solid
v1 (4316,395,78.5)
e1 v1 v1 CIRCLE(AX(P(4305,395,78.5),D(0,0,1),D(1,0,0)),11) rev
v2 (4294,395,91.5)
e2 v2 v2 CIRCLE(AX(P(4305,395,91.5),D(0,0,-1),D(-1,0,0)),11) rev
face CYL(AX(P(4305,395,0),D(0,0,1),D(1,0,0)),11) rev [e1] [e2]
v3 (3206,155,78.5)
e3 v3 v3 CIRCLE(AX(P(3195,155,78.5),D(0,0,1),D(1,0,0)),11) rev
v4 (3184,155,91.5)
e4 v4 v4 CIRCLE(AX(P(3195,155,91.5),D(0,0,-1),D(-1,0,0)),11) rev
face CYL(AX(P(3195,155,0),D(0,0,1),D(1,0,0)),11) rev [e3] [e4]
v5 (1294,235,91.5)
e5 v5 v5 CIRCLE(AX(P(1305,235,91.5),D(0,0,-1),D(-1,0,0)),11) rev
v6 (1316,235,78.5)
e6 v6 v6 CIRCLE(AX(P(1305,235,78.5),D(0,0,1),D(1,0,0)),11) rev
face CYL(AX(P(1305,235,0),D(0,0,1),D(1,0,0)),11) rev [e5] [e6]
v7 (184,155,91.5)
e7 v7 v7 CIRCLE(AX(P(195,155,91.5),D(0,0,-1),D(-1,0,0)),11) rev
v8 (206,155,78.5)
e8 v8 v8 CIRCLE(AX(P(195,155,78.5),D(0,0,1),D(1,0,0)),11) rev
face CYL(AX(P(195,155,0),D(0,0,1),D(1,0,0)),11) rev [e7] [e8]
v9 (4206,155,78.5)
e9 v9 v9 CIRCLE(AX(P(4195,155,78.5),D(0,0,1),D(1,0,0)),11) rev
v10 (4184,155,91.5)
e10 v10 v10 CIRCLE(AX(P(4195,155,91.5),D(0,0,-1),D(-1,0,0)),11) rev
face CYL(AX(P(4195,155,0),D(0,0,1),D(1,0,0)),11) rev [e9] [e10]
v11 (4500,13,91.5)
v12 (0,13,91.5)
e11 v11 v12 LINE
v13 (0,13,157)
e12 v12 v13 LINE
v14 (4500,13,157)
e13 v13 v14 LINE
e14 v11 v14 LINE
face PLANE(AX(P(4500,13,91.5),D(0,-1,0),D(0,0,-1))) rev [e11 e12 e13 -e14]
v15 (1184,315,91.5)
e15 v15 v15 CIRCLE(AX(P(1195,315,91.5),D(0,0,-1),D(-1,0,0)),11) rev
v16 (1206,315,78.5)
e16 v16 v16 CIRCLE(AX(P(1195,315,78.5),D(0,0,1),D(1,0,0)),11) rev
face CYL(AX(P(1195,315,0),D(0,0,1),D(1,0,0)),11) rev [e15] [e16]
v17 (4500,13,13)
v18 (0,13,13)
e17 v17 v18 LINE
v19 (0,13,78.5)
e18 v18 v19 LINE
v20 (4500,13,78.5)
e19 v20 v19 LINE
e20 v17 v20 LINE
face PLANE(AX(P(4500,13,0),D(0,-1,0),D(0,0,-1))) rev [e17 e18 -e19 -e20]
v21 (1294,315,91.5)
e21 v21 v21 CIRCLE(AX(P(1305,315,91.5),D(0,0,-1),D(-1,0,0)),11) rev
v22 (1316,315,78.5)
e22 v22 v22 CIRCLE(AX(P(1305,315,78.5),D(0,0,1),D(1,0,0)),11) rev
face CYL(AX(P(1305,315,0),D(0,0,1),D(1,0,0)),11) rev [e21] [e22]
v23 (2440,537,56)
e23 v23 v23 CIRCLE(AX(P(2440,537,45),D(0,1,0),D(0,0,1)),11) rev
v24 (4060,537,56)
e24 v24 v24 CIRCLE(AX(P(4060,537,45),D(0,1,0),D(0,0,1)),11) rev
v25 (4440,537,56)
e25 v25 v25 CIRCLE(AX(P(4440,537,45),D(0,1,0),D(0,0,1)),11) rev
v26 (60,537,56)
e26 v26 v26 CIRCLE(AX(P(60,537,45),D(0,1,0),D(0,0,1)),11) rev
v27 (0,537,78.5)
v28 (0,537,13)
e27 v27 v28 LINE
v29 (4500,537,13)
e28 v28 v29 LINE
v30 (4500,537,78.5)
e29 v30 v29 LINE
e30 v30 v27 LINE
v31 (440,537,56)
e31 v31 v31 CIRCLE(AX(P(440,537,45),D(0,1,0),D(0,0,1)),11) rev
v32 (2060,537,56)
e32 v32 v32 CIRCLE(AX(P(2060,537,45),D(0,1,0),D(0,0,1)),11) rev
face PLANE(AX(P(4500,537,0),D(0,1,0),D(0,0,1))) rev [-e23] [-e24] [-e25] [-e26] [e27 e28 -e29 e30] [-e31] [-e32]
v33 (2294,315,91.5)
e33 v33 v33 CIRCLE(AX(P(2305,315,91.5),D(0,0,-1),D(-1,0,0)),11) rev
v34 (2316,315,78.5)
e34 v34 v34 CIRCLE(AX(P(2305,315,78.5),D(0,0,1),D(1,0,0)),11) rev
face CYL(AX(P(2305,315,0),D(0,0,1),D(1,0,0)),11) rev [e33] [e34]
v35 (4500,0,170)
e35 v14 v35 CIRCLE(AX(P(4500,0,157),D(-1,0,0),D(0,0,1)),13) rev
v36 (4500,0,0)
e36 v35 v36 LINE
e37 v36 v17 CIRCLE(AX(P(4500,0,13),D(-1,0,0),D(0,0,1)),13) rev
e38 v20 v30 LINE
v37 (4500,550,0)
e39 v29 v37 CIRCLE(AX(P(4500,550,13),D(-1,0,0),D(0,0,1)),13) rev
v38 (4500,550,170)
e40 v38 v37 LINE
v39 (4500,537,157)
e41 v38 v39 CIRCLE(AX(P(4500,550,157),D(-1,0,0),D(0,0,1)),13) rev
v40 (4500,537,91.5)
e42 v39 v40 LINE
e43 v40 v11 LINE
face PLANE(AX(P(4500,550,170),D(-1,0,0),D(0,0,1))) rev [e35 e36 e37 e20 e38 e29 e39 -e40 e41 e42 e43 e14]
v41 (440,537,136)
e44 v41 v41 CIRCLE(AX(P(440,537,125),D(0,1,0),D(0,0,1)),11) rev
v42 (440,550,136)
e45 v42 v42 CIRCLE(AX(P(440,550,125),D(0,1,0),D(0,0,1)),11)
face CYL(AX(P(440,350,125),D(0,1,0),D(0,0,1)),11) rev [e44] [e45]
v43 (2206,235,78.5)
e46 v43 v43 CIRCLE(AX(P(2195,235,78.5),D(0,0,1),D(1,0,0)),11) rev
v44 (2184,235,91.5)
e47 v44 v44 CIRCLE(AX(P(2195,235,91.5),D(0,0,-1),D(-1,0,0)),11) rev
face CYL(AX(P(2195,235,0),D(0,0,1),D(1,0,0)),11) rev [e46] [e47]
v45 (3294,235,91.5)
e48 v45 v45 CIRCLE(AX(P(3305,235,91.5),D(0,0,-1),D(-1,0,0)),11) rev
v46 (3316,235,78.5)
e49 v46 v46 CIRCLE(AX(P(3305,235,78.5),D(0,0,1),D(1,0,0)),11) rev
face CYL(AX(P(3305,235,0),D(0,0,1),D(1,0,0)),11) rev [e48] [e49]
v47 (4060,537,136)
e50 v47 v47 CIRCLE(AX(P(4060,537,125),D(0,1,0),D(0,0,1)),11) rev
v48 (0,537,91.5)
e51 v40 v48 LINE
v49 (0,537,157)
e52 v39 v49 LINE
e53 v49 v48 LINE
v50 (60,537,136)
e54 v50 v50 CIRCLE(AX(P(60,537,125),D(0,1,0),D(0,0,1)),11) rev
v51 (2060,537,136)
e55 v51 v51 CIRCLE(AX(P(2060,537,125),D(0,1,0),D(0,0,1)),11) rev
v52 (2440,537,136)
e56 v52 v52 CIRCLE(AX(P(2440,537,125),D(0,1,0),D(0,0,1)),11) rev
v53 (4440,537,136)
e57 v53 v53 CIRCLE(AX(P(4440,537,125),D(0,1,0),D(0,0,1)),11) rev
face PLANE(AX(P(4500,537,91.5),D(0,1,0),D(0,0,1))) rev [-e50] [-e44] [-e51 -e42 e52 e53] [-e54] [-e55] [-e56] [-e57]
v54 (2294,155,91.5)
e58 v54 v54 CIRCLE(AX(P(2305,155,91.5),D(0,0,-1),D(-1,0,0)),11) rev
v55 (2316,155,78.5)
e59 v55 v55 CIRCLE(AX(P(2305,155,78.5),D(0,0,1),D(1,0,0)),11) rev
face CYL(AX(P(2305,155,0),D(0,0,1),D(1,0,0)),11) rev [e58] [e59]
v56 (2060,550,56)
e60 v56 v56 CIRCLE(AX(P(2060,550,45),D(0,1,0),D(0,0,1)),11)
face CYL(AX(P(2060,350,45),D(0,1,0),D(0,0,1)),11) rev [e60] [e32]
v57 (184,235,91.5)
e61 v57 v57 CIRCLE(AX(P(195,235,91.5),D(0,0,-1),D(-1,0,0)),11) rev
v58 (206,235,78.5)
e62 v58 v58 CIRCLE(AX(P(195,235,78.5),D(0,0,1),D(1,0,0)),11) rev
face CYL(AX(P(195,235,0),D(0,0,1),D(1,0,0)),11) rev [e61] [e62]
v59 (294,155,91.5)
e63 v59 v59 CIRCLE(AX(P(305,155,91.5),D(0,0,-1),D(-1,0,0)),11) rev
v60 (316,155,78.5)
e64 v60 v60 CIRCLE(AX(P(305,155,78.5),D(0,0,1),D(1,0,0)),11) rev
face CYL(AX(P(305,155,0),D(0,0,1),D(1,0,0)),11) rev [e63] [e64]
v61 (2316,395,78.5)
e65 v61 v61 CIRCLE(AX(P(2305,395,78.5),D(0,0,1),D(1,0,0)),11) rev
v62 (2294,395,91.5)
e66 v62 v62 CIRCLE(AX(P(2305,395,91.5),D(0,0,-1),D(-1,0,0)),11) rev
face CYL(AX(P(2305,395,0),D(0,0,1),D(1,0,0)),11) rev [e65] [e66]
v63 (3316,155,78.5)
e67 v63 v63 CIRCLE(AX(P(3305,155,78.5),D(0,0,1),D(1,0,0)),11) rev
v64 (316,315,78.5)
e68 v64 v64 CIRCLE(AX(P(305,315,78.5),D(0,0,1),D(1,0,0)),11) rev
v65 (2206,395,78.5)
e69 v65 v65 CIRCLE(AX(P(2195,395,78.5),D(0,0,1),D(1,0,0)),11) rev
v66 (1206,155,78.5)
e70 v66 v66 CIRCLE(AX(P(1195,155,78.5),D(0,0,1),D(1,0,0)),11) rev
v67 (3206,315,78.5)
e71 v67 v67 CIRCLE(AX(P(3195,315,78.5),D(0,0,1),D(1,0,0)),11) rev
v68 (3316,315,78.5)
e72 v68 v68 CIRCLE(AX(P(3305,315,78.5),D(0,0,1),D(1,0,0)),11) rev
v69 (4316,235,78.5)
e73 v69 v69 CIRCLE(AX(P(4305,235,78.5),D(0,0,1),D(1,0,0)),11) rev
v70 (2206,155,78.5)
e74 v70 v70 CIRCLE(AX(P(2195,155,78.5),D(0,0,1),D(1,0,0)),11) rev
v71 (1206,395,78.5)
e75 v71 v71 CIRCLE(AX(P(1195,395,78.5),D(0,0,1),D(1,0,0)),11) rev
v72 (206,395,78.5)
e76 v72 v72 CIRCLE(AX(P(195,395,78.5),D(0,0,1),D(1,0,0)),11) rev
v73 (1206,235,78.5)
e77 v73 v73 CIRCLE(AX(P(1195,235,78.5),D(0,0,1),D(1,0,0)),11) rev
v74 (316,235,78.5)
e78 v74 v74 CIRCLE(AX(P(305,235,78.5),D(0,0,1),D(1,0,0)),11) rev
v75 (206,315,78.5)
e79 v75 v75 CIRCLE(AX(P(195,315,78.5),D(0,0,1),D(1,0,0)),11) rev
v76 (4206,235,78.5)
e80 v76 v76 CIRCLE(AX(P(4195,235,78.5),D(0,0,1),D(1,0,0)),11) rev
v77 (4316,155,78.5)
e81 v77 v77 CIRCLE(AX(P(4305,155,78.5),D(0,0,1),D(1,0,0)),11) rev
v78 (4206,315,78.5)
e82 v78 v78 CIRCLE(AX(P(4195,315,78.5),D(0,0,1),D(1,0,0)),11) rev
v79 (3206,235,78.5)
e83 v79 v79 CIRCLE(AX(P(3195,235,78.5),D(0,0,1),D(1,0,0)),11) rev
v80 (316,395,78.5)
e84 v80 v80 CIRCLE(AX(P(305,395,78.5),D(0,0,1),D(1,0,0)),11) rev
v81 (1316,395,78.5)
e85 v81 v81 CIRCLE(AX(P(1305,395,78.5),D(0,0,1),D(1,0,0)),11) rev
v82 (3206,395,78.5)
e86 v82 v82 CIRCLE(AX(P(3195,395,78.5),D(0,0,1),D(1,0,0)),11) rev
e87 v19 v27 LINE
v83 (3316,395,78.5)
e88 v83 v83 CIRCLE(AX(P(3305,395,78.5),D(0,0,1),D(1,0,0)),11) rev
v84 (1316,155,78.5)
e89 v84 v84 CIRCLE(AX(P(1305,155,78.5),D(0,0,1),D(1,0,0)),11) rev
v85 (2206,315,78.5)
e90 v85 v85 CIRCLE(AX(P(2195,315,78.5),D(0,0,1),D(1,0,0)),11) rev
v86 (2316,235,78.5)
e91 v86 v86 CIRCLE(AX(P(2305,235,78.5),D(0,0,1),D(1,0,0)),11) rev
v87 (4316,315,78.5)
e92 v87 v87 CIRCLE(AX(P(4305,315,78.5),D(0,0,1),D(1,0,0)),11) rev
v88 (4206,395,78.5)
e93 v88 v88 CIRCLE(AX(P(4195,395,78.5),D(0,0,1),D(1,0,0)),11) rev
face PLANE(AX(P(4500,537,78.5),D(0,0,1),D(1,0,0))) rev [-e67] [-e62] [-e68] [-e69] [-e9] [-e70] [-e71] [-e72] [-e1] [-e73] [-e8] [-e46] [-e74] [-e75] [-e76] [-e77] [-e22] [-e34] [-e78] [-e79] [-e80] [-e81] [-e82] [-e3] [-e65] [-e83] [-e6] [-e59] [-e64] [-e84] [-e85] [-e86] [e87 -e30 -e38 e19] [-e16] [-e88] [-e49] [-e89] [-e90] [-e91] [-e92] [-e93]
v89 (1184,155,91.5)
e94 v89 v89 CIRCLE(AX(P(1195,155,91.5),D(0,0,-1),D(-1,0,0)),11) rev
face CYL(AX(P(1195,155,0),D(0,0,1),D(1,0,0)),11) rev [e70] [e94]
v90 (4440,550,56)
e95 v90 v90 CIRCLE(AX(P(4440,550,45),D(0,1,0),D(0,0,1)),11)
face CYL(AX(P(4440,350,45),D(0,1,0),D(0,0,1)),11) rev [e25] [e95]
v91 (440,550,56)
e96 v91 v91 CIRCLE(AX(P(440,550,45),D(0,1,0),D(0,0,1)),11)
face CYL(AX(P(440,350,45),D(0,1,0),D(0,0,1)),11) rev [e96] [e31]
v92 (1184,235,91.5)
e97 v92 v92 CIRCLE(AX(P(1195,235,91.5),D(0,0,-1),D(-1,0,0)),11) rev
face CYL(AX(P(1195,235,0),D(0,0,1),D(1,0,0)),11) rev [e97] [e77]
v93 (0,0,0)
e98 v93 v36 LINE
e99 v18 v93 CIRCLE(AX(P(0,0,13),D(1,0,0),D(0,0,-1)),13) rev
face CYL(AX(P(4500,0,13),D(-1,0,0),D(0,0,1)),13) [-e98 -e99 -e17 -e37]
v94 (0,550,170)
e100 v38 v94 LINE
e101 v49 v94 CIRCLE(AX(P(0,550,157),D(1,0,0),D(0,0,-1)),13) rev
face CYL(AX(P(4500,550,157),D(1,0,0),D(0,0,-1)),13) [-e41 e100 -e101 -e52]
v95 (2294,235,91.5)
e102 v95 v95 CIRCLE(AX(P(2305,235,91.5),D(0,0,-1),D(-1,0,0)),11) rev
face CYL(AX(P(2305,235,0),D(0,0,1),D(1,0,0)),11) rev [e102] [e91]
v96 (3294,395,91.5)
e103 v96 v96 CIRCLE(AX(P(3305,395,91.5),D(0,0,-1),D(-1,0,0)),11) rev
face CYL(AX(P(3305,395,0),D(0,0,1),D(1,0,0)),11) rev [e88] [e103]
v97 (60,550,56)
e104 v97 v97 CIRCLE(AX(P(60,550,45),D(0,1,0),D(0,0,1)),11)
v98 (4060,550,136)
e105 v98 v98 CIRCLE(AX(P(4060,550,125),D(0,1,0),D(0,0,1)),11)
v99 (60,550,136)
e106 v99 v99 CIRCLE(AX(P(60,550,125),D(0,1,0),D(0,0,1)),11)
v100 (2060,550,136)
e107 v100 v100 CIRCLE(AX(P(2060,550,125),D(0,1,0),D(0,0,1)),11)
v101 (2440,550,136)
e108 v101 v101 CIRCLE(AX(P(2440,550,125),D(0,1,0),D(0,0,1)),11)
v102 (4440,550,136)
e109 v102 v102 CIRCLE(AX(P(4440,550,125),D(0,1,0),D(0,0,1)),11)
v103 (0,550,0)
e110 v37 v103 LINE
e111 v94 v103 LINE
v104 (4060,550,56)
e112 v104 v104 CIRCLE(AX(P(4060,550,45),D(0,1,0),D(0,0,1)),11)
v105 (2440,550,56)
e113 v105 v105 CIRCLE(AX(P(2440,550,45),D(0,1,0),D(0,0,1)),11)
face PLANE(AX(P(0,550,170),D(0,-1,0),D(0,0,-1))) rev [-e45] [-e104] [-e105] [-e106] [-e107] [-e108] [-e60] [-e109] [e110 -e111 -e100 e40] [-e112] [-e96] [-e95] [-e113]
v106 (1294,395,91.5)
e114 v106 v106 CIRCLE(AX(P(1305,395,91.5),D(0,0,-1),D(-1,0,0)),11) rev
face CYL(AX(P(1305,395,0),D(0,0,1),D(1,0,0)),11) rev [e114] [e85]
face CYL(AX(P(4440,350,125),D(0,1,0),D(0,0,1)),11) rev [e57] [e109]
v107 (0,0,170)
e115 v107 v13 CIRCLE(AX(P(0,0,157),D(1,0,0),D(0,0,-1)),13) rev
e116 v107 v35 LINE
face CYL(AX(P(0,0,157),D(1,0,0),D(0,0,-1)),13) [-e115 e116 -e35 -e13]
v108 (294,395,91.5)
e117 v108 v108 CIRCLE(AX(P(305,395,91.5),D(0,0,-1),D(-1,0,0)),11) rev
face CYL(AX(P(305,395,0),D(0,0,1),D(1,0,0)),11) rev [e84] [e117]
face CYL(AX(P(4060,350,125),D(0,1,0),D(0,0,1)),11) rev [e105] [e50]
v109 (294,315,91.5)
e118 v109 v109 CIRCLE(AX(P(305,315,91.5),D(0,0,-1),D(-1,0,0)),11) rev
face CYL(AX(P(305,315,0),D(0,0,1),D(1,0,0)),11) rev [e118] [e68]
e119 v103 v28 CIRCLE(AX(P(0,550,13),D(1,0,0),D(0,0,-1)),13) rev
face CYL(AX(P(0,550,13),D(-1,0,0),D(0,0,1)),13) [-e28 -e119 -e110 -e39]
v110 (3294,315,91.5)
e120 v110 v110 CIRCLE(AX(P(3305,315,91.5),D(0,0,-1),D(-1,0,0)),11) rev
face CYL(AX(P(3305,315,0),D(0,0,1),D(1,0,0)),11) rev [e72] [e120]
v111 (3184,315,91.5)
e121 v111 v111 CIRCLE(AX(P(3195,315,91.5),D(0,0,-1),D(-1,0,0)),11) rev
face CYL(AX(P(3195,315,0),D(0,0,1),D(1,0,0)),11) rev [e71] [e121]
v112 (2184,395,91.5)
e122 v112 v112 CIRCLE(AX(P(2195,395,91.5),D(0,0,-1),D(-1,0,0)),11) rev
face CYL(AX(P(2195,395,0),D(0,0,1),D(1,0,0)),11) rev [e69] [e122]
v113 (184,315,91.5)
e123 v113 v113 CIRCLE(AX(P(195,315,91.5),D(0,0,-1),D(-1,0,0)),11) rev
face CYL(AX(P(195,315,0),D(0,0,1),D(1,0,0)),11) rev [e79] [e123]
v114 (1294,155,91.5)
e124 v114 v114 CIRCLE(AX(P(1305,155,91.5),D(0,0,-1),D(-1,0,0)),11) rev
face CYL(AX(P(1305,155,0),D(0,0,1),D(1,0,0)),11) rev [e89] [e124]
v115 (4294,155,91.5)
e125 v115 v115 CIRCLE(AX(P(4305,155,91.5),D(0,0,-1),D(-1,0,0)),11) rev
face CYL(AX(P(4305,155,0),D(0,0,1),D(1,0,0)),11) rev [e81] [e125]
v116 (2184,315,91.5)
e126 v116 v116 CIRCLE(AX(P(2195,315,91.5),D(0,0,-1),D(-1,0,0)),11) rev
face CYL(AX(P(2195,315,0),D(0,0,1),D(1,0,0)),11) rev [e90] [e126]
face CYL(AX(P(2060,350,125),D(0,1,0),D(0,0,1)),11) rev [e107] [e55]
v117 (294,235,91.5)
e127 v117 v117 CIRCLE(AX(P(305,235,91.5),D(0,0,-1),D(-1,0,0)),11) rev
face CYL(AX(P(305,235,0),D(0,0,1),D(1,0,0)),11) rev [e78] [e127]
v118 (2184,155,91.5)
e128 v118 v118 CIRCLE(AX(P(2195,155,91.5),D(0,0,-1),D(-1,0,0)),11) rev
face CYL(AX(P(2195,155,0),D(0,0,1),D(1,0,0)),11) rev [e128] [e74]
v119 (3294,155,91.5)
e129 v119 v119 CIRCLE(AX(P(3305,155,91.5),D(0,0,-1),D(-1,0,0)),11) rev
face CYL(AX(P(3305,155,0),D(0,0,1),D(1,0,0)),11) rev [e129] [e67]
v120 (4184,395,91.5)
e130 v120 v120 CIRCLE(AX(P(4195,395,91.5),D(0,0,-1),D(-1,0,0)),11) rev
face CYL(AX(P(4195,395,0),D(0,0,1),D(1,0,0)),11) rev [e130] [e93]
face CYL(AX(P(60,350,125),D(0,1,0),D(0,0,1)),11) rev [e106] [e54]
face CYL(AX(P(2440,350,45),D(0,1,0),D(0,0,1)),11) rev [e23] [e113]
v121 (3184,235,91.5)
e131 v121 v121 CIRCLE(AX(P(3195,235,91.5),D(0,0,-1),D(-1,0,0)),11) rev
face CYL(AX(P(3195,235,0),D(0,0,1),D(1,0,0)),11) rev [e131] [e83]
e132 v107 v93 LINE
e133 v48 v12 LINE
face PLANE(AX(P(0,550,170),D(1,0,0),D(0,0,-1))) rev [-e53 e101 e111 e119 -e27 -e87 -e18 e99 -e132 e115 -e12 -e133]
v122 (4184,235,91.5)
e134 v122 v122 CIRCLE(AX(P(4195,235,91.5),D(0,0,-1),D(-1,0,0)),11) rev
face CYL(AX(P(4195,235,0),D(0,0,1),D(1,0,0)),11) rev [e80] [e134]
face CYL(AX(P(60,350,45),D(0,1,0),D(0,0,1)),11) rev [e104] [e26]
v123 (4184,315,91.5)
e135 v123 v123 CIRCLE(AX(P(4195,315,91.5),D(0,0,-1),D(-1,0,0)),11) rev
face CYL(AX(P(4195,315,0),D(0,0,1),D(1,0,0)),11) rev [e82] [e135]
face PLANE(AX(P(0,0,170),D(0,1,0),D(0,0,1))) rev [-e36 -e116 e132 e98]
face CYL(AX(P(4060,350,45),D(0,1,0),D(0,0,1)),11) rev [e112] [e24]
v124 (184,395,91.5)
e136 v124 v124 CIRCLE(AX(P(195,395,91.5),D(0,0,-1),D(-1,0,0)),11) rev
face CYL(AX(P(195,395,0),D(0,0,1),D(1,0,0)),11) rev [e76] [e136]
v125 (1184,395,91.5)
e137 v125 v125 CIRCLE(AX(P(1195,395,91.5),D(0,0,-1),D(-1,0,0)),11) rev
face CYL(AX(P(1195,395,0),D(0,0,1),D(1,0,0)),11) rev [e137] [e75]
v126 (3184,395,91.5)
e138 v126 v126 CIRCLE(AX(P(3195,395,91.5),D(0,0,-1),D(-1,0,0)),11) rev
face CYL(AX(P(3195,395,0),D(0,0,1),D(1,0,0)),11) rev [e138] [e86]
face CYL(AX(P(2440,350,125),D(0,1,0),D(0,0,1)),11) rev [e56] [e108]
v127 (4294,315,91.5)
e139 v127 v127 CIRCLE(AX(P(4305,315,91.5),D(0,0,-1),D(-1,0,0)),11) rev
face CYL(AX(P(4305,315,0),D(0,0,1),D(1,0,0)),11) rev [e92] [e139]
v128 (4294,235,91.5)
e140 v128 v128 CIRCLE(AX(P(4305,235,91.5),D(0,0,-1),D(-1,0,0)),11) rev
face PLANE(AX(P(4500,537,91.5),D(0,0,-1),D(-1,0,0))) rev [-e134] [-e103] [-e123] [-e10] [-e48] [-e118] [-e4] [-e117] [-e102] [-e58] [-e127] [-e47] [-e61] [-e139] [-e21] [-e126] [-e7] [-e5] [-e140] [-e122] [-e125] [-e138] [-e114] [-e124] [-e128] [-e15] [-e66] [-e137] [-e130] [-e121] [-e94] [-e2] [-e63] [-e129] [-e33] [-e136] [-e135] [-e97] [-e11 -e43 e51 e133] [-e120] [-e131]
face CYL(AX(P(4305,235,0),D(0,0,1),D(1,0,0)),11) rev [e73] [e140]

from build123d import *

# Parameters (mm, degrees)
SKETCH_1_W                        = 4500
SKETCH_1_H                        = 550
EXTRUDE_1_DEPTH                   = 170
SKETCH_2_R                        = 11
CUT_EXTRUDE_1_DEPTH               = 4537.672789611
PATTERN_LINEAR_1_COUNT            = 2
PATTERN_LINEAR_1_PITCH            = 110
PATTERN_LINEAR_1_COUNT_DIR2       = 4
PATTERN_LINEAR_1_PITCH_DIR2       = 80
PATTERN_LINEAR_2_COUNT            = 5
PATTERN_LINEAR_2_PITCH            = 1000
PATTERN_LINEAR_2_COPY_1_SKETCH_R  = 11
PATTERN_LINEAR_2_COPY_1_DEPTH     = 4537.672789611
PATTERN_LINEAR_2_COPY_2_SKETCH_R  = 11
PATTERN_LINEAR_2_COPY_2_DEPTH     = 4537.672789611
PATTERN_LINEAR_2_COPY_3_SKETCH_R  = 11
PATTERN_LINEAR_2_COPY_3_DEPTH     = 4537.672789611
PATTERN_LINEAR_2_COPY_4_SKETCH_R  = 11
PATTERN_LINEAR_2_COPY_4_DEPTH     = 4537.672789611
PATTERN_LINEAR_2_COPY_5_SKETCH_R  = 11
PATTERN_LINEAR_2_COPY_5_DEPTH     = 4537.672789611
PATTERN_LINEAR_2_COPY_6_SKETCH_R  = 11
PATTERN_LINEAR_2_COPY_6_DEPTH     = 4537.672789611
PATTERN_LINEAR_2_COPY_7_SKETCH_R  = 11
PATTERN_LINEAR_2_COPY_7_DEPTH     = 4537.672789611
PATTERN_LINEAR_2_COPY_8_SKETCH_R  = 11
PATTERN_LINEAR_2_COPY_8_DEPTH     = 4537.672789611
PATTERN_LINEAR_2_COPY_9_SKETCH_R  = 11
PATTERN_LINEAR_2_COPY_9_DEPTH     = 4537.672789611
PATTERN_LINEAR_2_COPY_10_SKETCH_R = 11
PATTERN_LINEAR_2_COPY_10_DEPTH    = 4537.672789611
PATTERN_LINEAR_2_COPY_11_SKETCH_R = 11
PATTERN_LINEAR_2_COPY_11_DEPTH    = 4537.672789611
PATTERN_LINEAR_2_COPY_12_SKETCH_R = 11
PATTERN_LINEAR_2_COPY_12_DEPTH    = 4537.672789611
PATTERN_LINEAR_2_COPY_13_SKETCH_R = 11
PATTERN_LINEAR_2_COPY_13_DEPTH    = 4537.672789611
PATTERN_LINEAR_2_COPY_14_SKETCH_R = 11
PATTERN_LINEAR_2_COPY_14_DEPTH    = 4537.672789611
PATTERN_LINEAR_2_COPY_15_SKETCH_R = 11
PATTERN_LINEAR_2_COPY_15_DEPTH    = 4537.672789611
PATTERN_LINEAR_2_COPY_16_SKETCH_R = 11
PATTERN_LINEAR_2_COPY_16_DEPTH    = 4537.672789611
PATTERN_LINEAR_2_COPY_17_SKETCH_R = 11
PATTERN_LINEAR_2_COPY_17_DEPTH    = 4537.672789611
PATTERN_LINEAR_2_COPY_18_SKETCH_R = 11
PATTERN_LINEAR_2_COPY_18_DEPTH    = 4537.672789611
PATTERN_LINEAR_2_COPY_19_SKETCH_R = 11
PATTERN_LINEAR_2_COPY_19_DEPTH    = 4537.672789611
PATTERN_LINEAR_2_COPY_20_SKETCH_R = 11
PATTERN_LINEAR_2_COPY_20_DEPTH    = 4537.672789611
PATTERN_LINEAR_2_COPY_21_SKETCH_R = 11
PATTERN_LINEAR_2_COPY_21_DEPTH    = 4537.672789611
PATTERN_LINEAR_2_COPY_22_SKETCH_R = 11
PATTERN_LINEAR_2_COPY_22_DEPTH    = 4537.672789611
PATTERN_LINEAR_2_COPY_23_SKETCH_R = 11
PATTERN_LINEAR_2_COPY_23_DEPTH    = 4537.672789611
PATTERN_LINEAR_2_COPY_24_SKETCH_R = 11
PATTERN_LINEAR_2_COPY_24_DEPTH    = 4537.672789611
PATTERN_LINEAR_2_COPY_25_SKETCH_R = 11
PATTERN_LINEAR_2_COPY_25_DEPTH    = 4537.672789611
PATTERN_LINEAR_2_COPY_26_SKETCH_R = 11
PATTERN_LINEAR_2_COPY_26_DEPTH    = 4537.672789611
PATTERN_LINEAR_2_COPY_27_SKETCH_R = 11
PATTERN_LINEAR_2_COPY_27_DEPTH    = 4537.672789611
PATTERN_LINEAR_2_COPY_28_SKETCH_R = 11
PATTERN_LINEAR_2_COPY_28_DEPTH    = 4537.672789611
SKETCH_4_R                        = 11
CUT_EXTRUDE_2_DEPTH               = 200
PATTERN_LINEAR_3_COUNT            = 2
PATTERN_LINEAR_3_PITCH            = 380
PATTERN_LINEAR_4_COUNT            = 3
PATTERN_LINEAR_4_PITCH            = 2000
PATTERN_LINEAR_4_COPY_1_SKETCH_R  = 11
PATTERN_LINEAR_4_COPY_1_DEPTH     = 200
PATTERN_LINEAR_4_COPY_2_SKETCH_R  = 11
PATTERN_LINEAR_4_COPY_2_DEPTH     = 200
SKETCH_7_W                        = 78.5
SKETCH_7_H                        = 524
CUT_EXTRUDE_3_DEPTH               = 4537.672789611
FILLET_1_R                        = 13
FILLET_2_R                        = 13
FILLET_3_R                        = 13
FILLET_4_R                        = 13


with BuildPart() as part:
    # 草图1 → 拉伸1 (new body)
    with BuildSketch(Plane.XY):
        with Locations((2250, 275)):
            Rectangle(SKETCH_1_W, SKETCH_1_H)
    extrude(amount=EXTRUDE_1_DEPTH)

    # 草图2 → 切除-拉伸1 (cut, through all)
    with BuildSketch(Plane.XY.offset(170)):
        with Locations((195, 155)):
            Circle(SKETCH_2_R)
    cut_extrude_1 = extrude(amount=-CUT_EXTRUDE_1_DEPTH, mode=Mode.SUBTRACT)

    # 阵列(线性)1: Cut-Extrude 1 2 × 4
    with Locations(*[(i * PATTERN_LINEAR_1_PITCH, j * PATTERN_LINEAR_1_PITCH_DIR2, 0) for i in range(PATTERN_LINEAR_1_COUNT) for j in range(PATTERN_LINEAR_1_COUNT_DIR2) if (i, j) != (0, 0)]):
        add(cut_extrude_1, mode=Mode.SUBTRACT)

    # 阵列(线性)2: 切除-拉伸1 ×5
    with Locations(*[(i * PATTERN_LINEAR_2_PITCH, 0, 0) for i in range(1, PATTERN_LINEAR_2_COUNT)]):
        add(cut_extrude_1, mode=Mode.SUBTRACT)

    # 阵列(线性)2 copy 1 sketch → 阵列(线性)2 copy 1 (cut, through all)
    with BuildSketch(Plane(origin=(1000, 80, 170), x_dir=(1, 0, 0), z_dir=(0, 0, 1))):
        with Locations((195, 155)):
            Circle(PATTERN_LINEAR_2_COPY_1_SKETCH_R)
    extrude(amount=-PATTERN_LINEAR_2_COPY_1_DEPTH, mode=Mode.SUBTRACT)

    # 阵列(线性)2 copy 2 sketch → 阵列(线性)2 copy 2 (cut, through all)
    with BuildSketch(Plane(origin=(2000, 80, 170), x_dir=(1, 0, 0), z_dir=(0, 0, 1))):
        with Locations((195, 155)):
            Circle(PATTERN_LINEAR_2_COPY_2_SKETCH_R)
    extrude(amount=-PATTERN_LINEAR_2_COPY_2_DEPTH, mode=Mode.SUBTRACT)

    # 阵列(线性)2 copy 3 sketch → 阵列(线性)2 copy 3 (cut, through all)
    with BuildSketch(Plane(origin=(3000, 80, 170), x_dir=(1, 0, 0), z_dir=(0, 0, 1))):
        with Locations((195, 155)):
            Circle(PATTERN_LINEAR_2_COPY_3_SKETCH_R)
    extrude(amount=-PATTERN_LINEAR_2_COPY_3_DEPTH, mode=Mode.SUBTRACT)

    # 阵列(线性)2 copy 4 sketch → 阵列(线性)2 copy 4 (cut, through all)
    with BuildSketch(Plane(origin=(4000, 80, 170), x_dir=(1, 0, 0), z_dir=(0, 0, 1))):
        with Locations((195, 155)):
            Circle(PATTERN_LINEAR_2_COPY_4_SKETCH_R)
    extrude(amount=-PATTERN_LINEAR_2_COPY_4_DEPTH, mode=Mode.SUBTRACT)

    # 阵列(线性)2 copy 5 sketch → 阵列(线性)2 copy 5 (cut, through all)
    with BuildSketch(Plane(origin=(1000, 160, 170), x_dir=(1, 0, 0), z_dir=(0, 0, 1))):
        with Locations((195, 155)):
            Circle(PATTERN_LINEAR_2_COPY_5_SKETCH_R)
    extrude(amount=-PATTERN_LINEAR_2_COPY_5_DEPTH, mode=Mode.SUBTRACT)

    # 阵列(线性)2 copy 6 sketch → 阵列(线性)2 copy 6 (cut, through all)
    with BuildSketch(Plane(origin=(2000, 160, 170), x_dir=(1, 0, 0), z_dir=(0, 0, 1))):
        with Locations((195, 155)):
            Circle(PATTERN_LINEAR_2_COPY_6_SKETCH_R)
    extrude(amount=-PATTERN_LINEAR_2_COPY_6_DEPTH, mode=Mode.SUBTRACT)

    # 阵列(线性)2 copy 7 sketch → 阵列(线性)2 copy 7 (cut, through all)
    with BuildSketch(Plane(origin=(3000, 160, 170), x_dir=(1, 0, 0), z_dir=(0, 0, 1))):
        with Locations((195, 155)):
            Circle(PATTERN_LINEAR_2_COPY_7_SKETCH_R)
    extrude(amount=-PATTERN_LINEAR_2_COPY_7_DEPTH, mode=Mode.SUBTRACT)

    # 阵列(线性)2 copy 8 sketch → 阵列(线性)2 copy 8 (cut, through all)
    with BuildSketch(Plane(origin=(4000, 160, 170), x_dir=(1, 0, 0), z_dir=(0, 0, 1))):
        with Locations((195, 155)):
            Circle(PATTERN_LINEAR_2_COPY_8_SKETCH_R)
    extrude(amount=-PATTERN_LINEAR_2_COPY_8_DEPTH, mode=Mode.SUBTRACT)

    # 阵列(线性)2 copy 9 sketch → 阵列(线性)2 copy 9 (cut, through all)
    with BuildSketch(Plane(origin=(1000, 240, 170), x_dir=(1, 0, 0), z_dir=(0, 0, 1))):
        with Locations((195, 155)):
            Circle(PATTERN_LINEAR_2_COPY_9_SKETCH_R)
    extrude(amount=-PATTERN_LINEAR_2_COPY_9_DEPTH, mode=Mode.SUBTRACT)

    # 阵列(线性)2 copy 10 sketch → 阵列(线性)2 copy 10 (cut, through all)
    with BuildSketch(Plane(origin=(2000, 240, 170), x_dir=(1, 0, 0), z_dir=(0, 0, 1))):
        with Locations((195, 155)):
            Circle(PATTERN_LINEAR_2_COPY_10_SKETCH_R)
    extrude(amount=-PATTERN_LINEAR_2_COPY_10_DEPTH, mode=Mode.SUBTRACT)

    # 阵列(线性)2 copy 11 sketch → 阵列(线性)2 copy 11 (cut, through all)
    with BuildSketch(Plane(origin=(3000, 240, 170), x_dir=(1, 0, 0), z_dir=(0, 0, 1))):
        with Locations((195, 155)):
            Circle(PATTERN_LINEAR_2_COPY_11_SKETCH_R)
    extrude(amount=-PATTERN_LINEAR_2_COPY_11_DEPTH, mode=Mode.SUBTRACT)

    # 阵列(线性)2 copy 12 sketch → 阵列(线性)2 copy 12 (cut, through all)
    with BuildSketch(Plane(origin=(4000, 240, 170), x_dir=(1, 0, 0), z_dir=(0, 0, 1))):
        with Locations((195, 155)):
            Circle(PATTERN_LINEAR_2_COPY_12_SKETCH_R)
    extrude(amount=-PATTERN_LINEAR_2_COPY_12_DEPTH, mode=Mode.SUBTRACT)

    # 阵列(线性)2 copy 13 sketch → 阵列(线性)2 copy 13 (cut, through all)
    with BuildSketch(Plane(origin=(1110, 0, 170), x_dir=(1, 0, 0), z_dir=(0, 0, 1))):
        with Locations((195, 155)):
            Circle(PATTERN_LINEAR_2_COPY_13_SKETCH_R)
    extrude(amount=-PATTERN_LINEAR_2_COPY_13_DEPTH, mode=Mode.SUBTRACT)

    # 阵列(线性)2 copy 14 sketch → 阵列(线性)2 copy 14 (cut, through all)
    with BuildSketch(Plane(origin=(2110, 0, 170), x_dir=(1, 0, 0), z_dir=(0, 0, 1))):
        with Locations((195, 155)):
            Circle(PATTERN_LINEAR_2_COPY_14_SKETCH_R)
    extrude(amount=-PATTERN_LINEAR_2_COPY_14_DEPTH, mode=Mode.SUBTRACT)

    # 阵列(线性)2 copy 15 sketch → 阵列(线性)2 copy 15 (cut, through all)
    with BuildSketch(Plane(origin=(3110, 0, 170), x_dir=(1, 0, 0), z_dir=(0, 0, 1))):
        with Locations((195, 155)):
            Circle(PATTERN_LINEAR_2_COPY_15_SKETCH_R)
    extrude(amount=-PATTERN_LINEAR_2_COPY_15_DEPTH, mode=Mode.SUBTRACT)

    # 阵列(线性)2 copy 16 sketch → 阵列(线性)2 copy 16 (cut, through all)
    with BuildSketch(Plane(origin=(4110, 0, 170), x_dir=(1, 0, 0), z_dir=(0, 0, 1))):
        with Locations((195, 155)):
            Circle(PATTERN_LINEAR_2_COPY_16_SKETCH_R)
    extrude(amount=-PATTERN_LINEAR_2_COPY_16_DEPTH, mode=Mode.SUBTRACT)

    # 阵列(线性)2 copy 17 sketch → 阵列(线性)2 copy 17 (cut, through all)
    with BuildSketch(Plane(origin=(1110, 80, 170), x_dir=(1, 0, 0), z_dir=(0, 0, 1))):
        with Locations((195, 155)):
            Circle(PATTERN_LINEAR_2_COPY_17_SKETCH_R)
    extrude(amount=-PATTERN_LINEAR_2_COPY_17_DEPTH, mode=Mode.SUBTRACT)

    # 阵列(线性)2 copy 18 sketch → 阵列(线性)2 copy 18 (cut, through all)
    with BuildSketch(Plane(origin=(2110, 80, 170), x_dir=(1, 0, 0), z_dir=(0, 0, 1))):
        with Locations((195, 155)):
            Circle(PATTERN_LINEAR_2_COPY_18_SKETCH_R)
    extrude(amount=-PATTERN_LINEAR_2_COPY_18_DEPTH, mode=Mode.SUBTRACT)

    # 阵列(线性)2 copy 19 sketch → 阵列(线性)2 copy 19 (cut, through all)
    with BuildSketch(Plane(origin=(3110, 80, 170), x_dir=(1, 0, 0), z_dir=(0, 0, 1))):
        with Locations((195, 155)):
            Circle(PATTERN_LINEAR_2_COPY_19_SKETCH_R)
    extrude(amount=-PATTERN_LINEAR_2_COPY_19_DEPTH, mode=Mode.SUBTRACT)

    # 阵列(线性)2 copy 20 sketch → 阵列(线性)2 copy 20 (cut, through all)
    with BuildSketch(Plane(origin=(4110, 80, 170), x_dir=(1, 0, 0), z_dir=(0, 0, 1))):
        with Locations((195, 155)):
            Circle(PATTERN_LINEAR_2_COPY_20_SKETCH_R)
    extrude(amount=-PATTERN_LINEAR_2_COPY_20_DEPTH, mode=Mode.SUBTRACT)

    # 阵列(线性)2 copy 21 sketch → 阵列(线性)2 copy 21 (cut, through all)
    with BuildSketch(Plane(origin=(1110, 160, 170), x_dir=(1, 0, 0), z_dir=(0, 0, 1))):
        with Locations((195, 155)):
            Circle(PATTERN_LINEAR_2_COPY_21_SKETCH_R)
    extrude(amount=-PATTERN_LINEAR_2_COPY_21_DEPTH, mode=Mode.SUBTRACT)

    # 阵列(线性)2 copy 22 sketch → 阵列(线性)2 copy 22 (cut, through all)
    with BuildSketch(Plane(origin=(2110, 160, 170), x_dir=(1, 0, 0), z_dir=(0, 0, 1))):
        with Locations((195, 155)):
            Circle(PATTERN_LINEAR_2_COPY_22_SKETCH_R)
    extrude(amount=-PATTERN_LINEAR_2_COPY_22_DEPTH, mode=Mode.SUBTRACT)

    # 阵列(线性)2 copy 23 sketch → 阵列(线性)2 copy 23 (cut, through all)
    with BuildSketch(Plane(origin=(3110, 160, 170), x_dir=(1, 0, 0), z_dir=(0, 0, 1))):
        with Locations((195, 155)):
            Circle(PATTERN_LINEAR_2_COPY_23_SKETCH_R)
    extrude(amount=-PATTERN_LINEAR_2_COPY_23_DEPTH, mode=Mode.SUBTRACT)

    # 阵列(线性)2 copy 24 sketch → 阵列(线性)2 copy 24 (cut, through all)
    with BuildSketch(Plane(origin=(4110, 160, 170), x_dir=(1, 0, 0), z_dir=(0, 0, 1))):
        with Locations((195, 155)):
            Circle(PATTERN_LINEAR_2_COPY_24_SKETCH_R)
    extrude(amount=-PATTERN_LINEAR_2_COPY_24_DEPTH, mode=Mode.SUBTRACT)

    # 阵列(线性)2 copy 25 sketch → 阵列(线性)2 copy 25 (cut, through all)
    with BuildSketch(Plane(origin=(1110, 240, 170), x_dir=(1, 0, 0), z_dir=(0, 0, 1))):
        with Locations((195, 155)):
            Circle(PATTERN_LINEAR_2_COPY_25_SKETCH_R)
    extrude(amount=-PATTERN_LINEAR_2_COPY_25_DEPTH, mode=Mode.SUBTRACT)

    # 阵列(线性)2 copy 26 sketch → 阵列(线性)2 copy 26 (cut, through all)
    with BuildSketch(Plane(origin=(2110, 240, 170), x_dir=(1, 0, 0), z_dir=(0, 0, 1))):
        with Locations((195, 155)):
            Circle(PATTERN_LINEAR_2_COPY_26_SKETCH_R)
    extrude(amount=-PATTERN_LINEAR_2_COPY_26_DEPTH, mode=Mode.SUBTRACT)

    # 阵列(线性)2 copy 27 sketch → 阵列(线性)2 copy 27 (cut, through all)
    with BuildSketch(Plane(origin=(3110, 240, 170), x_dir=(1, 0, 0), z_dir=(0, 0, 1))):
        with Locations((195, 155)):
            Circle(PATTERN_LINEAR_2_COPY_27_SKETCH_R)
    extrude(amount=-PATTERN_LINEAR_2_COPY_27_DEPTH, mode=Mode.SUBTRACT)

    # 阵列(线性)2 copy 28 sketch → 阵列(线性)2 copy 28 (cut, through all)
    with BuildSketch(Plane(origin=(4110, 240, 170), x_dir=(1, 0, 0), z_dir=(0, 0, 1))):
        with Locations((195, 155)):
            Circle(PATTERN_LINEAR_2_COPY_28_SKETCH_R)
    extrude(amount=-PATTERN_LINEAR_2_COPY_28_DEPTH, mode=Mode.SUBTRACT)

    # 草图4 → 切除-拉伸2 (cut)
    with BuildSketch(Plane(origin=(0, 550, 0), x_dir=(1, 0, 0), z_dir=(0, 1, 0))):
        with Locations(Location((60, -125, 0), (0, 0, 270))):
            Circle(SKETCH_4_R)
        with Locations(Location((60, -45, 0), (0, 0, 270))):
            Circle(SKETCH_4_R)
    cut_extrude_2 = extrude(amount=-CUT_EXTRUDE_2_DEPTH, mode=Mode.SUBTRACT)

    # 阵列(线性)3: 切除-拉伸2 ×2
    with Locations(*[(i * PATTERN_LINEAR_3_PITCH, 0, 0) for i in range(1, PATTERN_LINEAR_3_COUNT)]):
        add(cut_extrude_2, mode=Mode.SUBTRACT)

    # 阵列(线性)4: 切除-拉伸2 ×3
    with Locations(*[(i * PATTERN_LINEAR_4_PITCH, 0, 0) for i in range(1, PATTERN_LINEAR_4_COUNT)]):
        add(cut_extrude_2, mode=Mode.SUBTRACT)

    # 阵列(线性)4 copy 1 sketch → 阵列(线性)4 copy 1 (cut)
    with BuildSketch(Plane(origin=(2380, 550, 0), x_dir=(1, 0, 0), z_dir=(0, 1, 0))):
        with Locations(Location((60, -125, 0), (0, 0, 270))):
            Circle(PATTERN_LINEAR_4_COPY_1_SKETCH_R)
        with Locations(Location((60, -45, 0), (0, 0, 270))):
            Circle(PATTERN_LINEAR_4_COPY_1_SKETCH_R)
    extrude(amount=-PATTERN_LINEAR_4_COPY_1_DEPTH, mode=Mode.SUBTRACT)

    # 阵列(线性)4 copy 2 sketch → 阵列(线性)4 copy 2 (cut)
    with BuildSketch(Plane(origin=(4380, 550, 0), x_dir=(1, 0, 0), z_dir=(0, 1, 0))):
        with Locations(Location((60, -125, 0), (0, 0, 270))):
            Circle(PATTERN_LINEAR_4_COPY_2_SKETCH_R)
        with Locations(Location((60, -45, 0), (0, 0, 270))):
            Circle(PATTERN_LINEAR_4_COPY_2_SKETCH_R)
    extrude(amount=-PATTERN_LINEAR_4_COPY_2_DEPTH, mode=Mode.SUBTRACT)

    # 草图7 → 切除-拉伸3 (cut, through all)
    with BuildSketch(Plane.ZY):
        with Locations((130.75, 275)):
            Rectangle(SKETCH_7_W, SKETCH_7_H)
        with Locations((39.25, 275)):
            Rectangle(SKETCH_7_W, SKETCH_7_H)
    extrude(amount=-CUT_EXTRUDE_3_DEPTH, mode=Mode.SUBTRACT)

    # 圆角1
    fillet_1_edges = [part.edges().sort_by_distance(p)[0] for p in [
        (2250, 537, 0),
    ]]
    fillet(fillet_1_edges, radius=FILLET_1_R - 0.0001)  # a hair under: the kernel refuses the full size

    # 圆角2
    fillet_2_edges = [part.edges().sort_by_distance(p)[0] for p in [
        (2250, 537, 170),
    ]]
    fillet(fillet_2_edges, radius=FILLET_2_R - 0.0001)  # a hair under: the kernel refuses the full size

    # 圆角3
    fillet_3_edges = [part.edges().sort_by_distance(p)[0] for p in [
        (2250, 13, 0),
    ]]
    fillet(fillet_3_edges, radius=FILLET_3_R - 0.0001)  # a hair under: the kernel refuses the full size

    # 圆角4
    fillet_4_edges = [part.edges().sort_by_distance(p)[0] for p in [
        (2250, 13, 170),
    ]]
    fillet(fillet_4_edges, radius=FILLET_4_R - 0.0001)  # a hair under: the kernel refuses the full size


solid = part.part
